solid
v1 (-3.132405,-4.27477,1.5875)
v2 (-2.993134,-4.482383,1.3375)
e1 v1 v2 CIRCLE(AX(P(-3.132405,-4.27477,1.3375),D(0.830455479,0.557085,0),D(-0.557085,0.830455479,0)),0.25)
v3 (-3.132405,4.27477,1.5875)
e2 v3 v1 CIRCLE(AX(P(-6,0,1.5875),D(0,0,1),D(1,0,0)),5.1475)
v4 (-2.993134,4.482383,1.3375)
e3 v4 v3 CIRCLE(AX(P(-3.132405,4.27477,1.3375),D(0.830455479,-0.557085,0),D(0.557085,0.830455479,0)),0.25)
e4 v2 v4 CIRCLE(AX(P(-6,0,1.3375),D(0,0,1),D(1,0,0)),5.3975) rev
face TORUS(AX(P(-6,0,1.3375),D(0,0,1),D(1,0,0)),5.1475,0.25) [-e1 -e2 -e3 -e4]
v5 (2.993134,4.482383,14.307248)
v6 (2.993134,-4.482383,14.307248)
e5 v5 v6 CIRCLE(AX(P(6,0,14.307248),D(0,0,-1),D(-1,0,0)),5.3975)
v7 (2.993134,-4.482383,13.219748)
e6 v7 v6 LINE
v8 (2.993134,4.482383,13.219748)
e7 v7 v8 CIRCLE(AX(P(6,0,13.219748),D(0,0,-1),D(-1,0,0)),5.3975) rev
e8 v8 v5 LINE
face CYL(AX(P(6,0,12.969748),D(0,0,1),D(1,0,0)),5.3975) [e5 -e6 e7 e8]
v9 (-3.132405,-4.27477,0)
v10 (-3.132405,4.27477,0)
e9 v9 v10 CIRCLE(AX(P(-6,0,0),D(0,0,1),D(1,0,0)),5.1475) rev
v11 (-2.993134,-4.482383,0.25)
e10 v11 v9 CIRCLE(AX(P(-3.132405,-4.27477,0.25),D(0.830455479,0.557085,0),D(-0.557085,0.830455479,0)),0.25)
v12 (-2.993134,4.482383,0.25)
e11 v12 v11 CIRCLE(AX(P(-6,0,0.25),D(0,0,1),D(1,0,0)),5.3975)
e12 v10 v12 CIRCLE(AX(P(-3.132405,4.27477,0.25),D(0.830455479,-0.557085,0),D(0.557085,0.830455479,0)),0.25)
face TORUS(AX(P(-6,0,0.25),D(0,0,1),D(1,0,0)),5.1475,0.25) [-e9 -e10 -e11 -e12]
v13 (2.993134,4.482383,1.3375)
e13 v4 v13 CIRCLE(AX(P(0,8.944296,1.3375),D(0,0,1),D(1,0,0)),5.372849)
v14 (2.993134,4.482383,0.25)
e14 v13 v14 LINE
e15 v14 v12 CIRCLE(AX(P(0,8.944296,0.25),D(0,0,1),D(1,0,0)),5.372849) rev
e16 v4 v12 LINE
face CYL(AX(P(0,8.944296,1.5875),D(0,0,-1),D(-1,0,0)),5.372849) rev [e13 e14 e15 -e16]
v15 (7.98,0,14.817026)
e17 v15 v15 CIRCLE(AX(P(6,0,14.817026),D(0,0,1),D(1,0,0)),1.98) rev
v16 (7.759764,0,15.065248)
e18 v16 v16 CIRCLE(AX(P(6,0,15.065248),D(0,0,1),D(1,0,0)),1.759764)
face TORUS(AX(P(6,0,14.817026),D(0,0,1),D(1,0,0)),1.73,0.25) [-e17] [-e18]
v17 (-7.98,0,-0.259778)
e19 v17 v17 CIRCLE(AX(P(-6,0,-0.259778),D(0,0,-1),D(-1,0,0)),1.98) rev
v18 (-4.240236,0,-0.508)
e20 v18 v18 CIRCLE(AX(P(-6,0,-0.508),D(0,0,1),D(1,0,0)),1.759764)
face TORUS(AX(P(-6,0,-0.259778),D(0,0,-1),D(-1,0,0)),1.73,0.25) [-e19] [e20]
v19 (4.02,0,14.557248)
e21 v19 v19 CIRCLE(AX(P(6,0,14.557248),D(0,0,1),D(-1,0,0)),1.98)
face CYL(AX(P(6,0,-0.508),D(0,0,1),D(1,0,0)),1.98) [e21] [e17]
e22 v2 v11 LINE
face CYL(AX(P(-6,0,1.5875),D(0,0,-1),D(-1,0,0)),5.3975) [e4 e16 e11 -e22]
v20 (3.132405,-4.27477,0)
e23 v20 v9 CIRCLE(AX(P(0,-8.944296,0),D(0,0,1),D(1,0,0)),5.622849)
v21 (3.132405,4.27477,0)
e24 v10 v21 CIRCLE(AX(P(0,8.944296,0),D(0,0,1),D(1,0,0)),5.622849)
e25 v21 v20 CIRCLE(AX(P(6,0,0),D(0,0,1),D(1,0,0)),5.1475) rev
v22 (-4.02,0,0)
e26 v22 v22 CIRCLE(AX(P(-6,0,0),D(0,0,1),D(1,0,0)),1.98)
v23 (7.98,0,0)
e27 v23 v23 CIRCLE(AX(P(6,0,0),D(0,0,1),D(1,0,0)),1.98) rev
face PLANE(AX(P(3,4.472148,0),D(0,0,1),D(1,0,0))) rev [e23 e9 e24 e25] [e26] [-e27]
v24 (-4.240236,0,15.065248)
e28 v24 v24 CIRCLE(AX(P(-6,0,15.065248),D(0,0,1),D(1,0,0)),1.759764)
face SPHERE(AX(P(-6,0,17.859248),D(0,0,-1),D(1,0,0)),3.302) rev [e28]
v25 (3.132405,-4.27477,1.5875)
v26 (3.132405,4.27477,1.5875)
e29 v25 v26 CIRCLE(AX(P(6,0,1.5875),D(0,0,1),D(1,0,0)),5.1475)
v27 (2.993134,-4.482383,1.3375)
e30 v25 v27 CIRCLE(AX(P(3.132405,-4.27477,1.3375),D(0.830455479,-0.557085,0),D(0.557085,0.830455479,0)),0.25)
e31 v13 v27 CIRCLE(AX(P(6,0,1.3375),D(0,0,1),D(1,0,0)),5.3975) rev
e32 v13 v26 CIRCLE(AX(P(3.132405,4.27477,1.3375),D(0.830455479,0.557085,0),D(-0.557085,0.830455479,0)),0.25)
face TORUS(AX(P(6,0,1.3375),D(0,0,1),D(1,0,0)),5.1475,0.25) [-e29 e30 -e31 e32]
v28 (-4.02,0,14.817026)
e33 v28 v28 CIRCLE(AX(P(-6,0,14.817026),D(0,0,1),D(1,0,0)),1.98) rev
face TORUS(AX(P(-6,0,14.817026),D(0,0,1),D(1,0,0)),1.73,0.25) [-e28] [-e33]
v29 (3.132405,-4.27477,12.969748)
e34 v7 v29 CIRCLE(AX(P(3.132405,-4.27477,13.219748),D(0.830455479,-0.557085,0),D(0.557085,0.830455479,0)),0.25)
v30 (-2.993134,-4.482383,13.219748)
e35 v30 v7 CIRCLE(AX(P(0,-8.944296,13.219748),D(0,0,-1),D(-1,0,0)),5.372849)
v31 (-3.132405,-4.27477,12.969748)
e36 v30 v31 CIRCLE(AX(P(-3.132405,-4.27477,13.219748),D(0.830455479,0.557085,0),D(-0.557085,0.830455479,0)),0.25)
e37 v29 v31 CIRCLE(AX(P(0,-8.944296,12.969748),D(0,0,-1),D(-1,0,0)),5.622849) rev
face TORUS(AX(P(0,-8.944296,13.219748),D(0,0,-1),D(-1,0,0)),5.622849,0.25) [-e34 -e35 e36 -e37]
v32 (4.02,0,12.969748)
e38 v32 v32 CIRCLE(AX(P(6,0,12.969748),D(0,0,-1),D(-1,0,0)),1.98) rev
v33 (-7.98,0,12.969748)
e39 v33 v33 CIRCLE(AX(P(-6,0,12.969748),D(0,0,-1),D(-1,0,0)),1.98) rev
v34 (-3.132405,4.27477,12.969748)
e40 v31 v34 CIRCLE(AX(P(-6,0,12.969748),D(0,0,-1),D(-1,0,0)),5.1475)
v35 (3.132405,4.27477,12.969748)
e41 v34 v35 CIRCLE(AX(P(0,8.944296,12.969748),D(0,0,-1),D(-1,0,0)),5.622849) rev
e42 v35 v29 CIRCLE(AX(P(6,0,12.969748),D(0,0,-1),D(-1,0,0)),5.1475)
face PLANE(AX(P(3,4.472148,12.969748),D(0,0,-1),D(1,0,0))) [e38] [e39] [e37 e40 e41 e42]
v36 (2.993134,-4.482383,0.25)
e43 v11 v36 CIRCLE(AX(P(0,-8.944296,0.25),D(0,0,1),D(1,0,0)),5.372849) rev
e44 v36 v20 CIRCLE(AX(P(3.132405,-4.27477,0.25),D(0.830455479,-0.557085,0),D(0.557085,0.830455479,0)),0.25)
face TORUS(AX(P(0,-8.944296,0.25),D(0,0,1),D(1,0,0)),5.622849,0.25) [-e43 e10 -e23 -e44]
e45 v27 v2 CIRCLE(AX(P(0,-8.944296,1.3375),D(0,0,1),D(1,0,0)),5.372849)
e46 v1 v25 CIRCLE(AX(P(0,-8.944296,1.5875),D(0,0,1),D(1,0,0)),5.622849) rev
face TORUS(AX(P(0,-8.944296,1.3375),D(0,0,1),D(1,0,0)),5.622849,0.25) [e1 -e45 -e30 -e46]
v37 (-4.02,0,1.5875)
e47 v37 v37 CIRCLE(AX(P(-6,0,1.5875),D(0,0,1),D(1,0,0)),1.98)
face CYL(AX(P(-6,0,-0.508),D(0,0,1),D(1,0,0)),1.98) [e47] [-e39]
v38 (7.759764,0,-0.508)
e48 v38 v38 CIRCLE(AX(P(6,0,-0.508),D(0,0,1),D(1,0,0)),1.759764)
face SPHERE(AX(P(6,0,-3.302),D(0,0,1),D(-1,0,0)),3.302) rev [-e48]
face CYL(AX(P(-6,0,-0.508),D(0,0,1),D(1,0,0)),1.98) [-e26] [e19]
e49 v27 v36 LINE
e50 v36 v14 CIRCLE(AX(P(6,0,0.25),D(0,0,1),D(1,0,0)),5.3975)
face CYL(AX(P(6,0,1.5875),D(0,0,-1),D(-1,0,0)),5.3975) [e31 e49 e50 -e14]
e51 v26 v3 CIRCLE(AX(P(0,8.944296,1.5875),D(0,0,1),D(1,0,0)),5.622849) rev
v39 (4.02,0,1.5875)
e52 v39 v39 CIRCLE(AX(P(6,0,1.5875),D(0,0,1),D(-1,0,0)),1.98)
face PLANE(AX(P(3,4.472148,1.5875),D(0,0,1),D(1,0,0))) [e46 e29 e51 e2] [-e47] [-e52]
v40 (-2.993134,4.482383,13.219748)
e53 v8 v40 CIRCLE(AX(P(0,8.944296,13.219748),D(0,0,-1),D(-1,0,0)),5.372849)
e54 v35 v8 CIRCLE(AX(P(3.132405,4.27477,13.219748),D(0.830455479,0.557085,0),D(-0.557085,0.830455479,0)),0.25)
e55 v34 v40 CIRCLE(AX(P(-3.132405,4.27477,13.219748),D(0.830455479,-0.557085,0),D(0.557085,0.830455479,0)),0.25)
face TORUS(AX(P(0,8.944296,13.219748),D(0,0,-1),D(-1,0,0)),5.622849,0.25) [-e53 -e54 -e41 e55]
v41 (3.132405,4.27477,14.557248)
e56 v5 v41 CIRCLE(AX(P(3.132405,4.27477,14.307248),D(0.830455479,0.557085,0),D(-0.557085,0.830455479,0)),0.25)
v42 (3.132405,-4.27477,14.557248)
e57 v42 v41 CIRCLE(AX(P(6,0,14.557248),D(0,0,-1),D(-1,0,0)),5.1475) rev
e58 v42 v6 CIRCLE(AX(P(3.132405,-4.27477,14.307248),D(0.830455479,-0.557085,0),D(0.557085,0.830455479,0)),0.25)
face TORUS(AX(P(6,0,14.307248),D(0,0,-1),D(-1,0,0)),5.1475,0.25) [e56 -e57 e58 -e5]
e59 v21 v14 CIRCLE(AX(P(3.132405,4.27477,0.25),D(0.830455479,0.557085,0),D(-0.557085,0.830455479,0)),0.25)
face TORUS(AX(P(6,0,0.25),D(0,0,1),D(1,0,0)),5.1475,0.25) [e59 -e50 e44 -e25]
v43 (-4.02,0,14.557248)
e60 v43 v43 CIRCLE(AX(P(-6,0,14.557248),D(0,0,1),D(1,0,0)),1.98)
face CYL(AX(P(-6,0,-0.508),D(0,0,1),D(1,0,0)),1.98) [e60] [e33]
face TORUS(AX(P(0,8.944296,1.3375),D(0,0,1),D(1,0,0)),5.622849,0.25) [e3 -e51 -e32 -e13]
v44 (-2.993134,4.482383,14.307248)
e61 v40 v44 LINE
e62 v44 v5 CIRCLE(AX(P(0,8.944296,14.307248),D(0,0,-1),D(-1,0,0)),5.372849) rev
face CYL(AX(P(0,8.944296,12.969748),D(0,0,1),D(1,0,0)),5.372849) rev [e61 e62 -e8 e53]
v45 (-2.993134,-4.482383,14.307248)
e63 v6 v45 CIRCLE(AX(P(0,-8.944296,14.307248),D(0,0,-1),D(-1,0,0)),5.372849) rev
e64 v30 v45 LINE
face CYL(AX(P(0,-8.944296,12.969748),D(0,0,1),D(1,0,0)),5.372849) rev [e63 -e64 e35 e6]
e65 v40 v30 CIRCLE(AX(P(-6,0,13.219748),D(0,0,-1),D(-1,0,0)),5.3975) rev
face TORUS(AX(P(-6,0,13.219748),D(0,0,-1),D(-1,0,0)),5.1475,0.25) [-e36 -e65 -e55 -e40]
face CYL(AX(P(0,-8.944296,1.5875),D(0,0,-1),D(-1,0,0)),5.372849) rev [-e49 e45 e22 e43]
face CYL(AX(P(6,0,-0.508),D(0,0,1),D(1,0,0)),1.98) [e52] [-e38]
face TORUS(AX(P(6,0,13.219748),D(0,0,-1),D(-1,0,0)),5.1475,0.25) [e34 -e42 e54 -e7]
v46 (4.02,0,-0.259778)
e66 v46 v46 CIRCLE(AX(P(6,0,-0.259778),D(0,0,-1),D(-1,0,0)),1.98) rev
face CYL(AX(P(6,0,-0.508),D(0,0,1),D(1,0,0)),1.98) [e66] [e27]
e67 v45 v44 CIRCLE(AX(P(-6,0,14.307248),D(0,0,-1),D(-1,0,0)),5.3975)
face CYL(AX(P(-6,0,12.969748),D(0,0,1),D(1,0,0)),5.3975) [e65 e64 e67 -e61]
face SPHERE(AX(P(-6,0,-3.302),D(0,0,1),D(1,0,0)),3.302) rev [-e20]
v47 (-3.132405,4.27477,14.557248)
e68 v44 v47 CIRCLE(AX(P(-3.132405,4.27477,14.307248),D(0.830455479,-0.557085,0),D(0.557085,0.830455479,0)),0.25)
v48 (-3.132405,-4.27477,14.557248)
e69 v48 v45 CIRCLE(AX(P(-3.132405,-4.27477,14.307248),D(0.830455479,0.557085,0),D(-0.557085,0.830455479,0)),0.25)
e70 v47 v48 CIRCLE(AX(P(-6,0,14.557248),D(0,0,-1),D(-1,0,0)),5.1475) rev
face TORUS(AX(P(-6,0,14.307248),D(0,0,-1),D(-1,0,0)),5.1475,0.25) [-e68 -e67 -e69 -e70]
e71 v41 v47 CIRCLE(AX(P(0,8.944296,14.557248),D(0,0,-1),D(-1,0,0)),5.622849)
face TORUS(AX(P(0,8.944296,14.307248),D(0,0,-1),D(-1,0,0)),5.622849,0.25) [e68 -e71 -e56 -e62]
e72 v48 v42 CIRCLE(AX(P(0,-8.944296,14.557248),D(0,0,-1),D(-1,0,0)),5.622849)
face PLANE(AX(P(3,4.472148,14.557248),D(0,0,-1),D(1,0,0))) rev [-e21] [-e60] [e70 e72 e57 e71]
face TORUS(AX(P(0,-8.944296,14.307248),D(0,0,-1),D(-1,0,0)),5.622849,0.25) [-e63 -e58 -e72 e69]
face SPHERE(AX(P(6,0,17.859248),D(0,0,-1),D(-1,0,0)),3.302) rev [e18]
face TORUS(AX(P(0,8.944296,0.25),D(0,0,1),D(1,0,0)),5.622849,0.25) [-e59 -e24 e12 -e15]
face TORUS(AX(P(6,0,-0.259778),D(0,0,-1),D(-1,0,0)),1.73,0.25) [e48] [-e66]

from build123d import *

# Parameters (mm, degrees)
SKETCH2_R           = 1.98
BOSS_EXTRUDE2_DEPTH = 1.5875
BOSS_EXTRUDE3_START = -0.508
SKETCH3_R           = 1.98
BOSS_EXTRUDE3_DEPTH = 15.573248
FILLET1_R           = 0.25
FILLET2_R           = 0.25


with BuildPart() as part:
    # Sketch2 → Boss-Extrude2 (new body)
    with BuildSketch(Plane.XY):
        with BuildLine():
            ThreePointArc((-2.993133713, 4.482383449), (-11.3975, 0), (-2.993133713, -4.482383449))
            ThreePointArc((-2.993133713, -4.482383449), (0, -3.571446301), (2.993133713, -4.482383449))
            ThreePointArc((2.993133713, -4.482383449), (11.3975, 0), (2.993133713, 4.482383449))
            ThreePointArc((2.993133713, 4.482383449), (0, 3.571446301), (-2.993133713, 4.482383449))
        make_face()
        with Locations((-6, 0)):
            Circle(SKETCH2_R, mode=Mode.SUBTRACT)
        with Locations(Location((6, 0, 0), (0, 0, 180))):
            Circle(SKETCH2_R, mode=Mode.SUBTRACT)
    boss_extrude2 = extrude(amount=BOSS_EXTRUDE2_DEPTH)

    # Sketch3 → Boss-Extrude3 (add)
    with BuildSketch(Plane.XY.offset(BOSS_EXTRUDE3_START)):
        with Locations((-6, 0)):
            Circle(SKETCH3_R)
    boss_extrude3 = extrude(amount=BOSS_EXTRUDE3_DEPTH)

    # Mirror1: Boss-Extrude2 across plane
    add(boss_extrude2.mirror(Plane(origin=(0, 0, 7.278624), x_dir=(1, 0, 0), z_dir=(0, 0, -1))))

    # Sketch5 → Cut-Revolve1 (revolve, cut)
    with BuildSketch(Plane(origin=(0, 0, 0), x_dir=(1, 0, 0), z_dir=(0, 1, 0)), mode=Mode.PRIVATE) as cut_revolve1_sk:
        with BuildLine():
            Line((-6, -15.319248), (-8.109882461, -15.319248))
            ThreePointArc((-8.109882461, -15.319248), (-7.12163363, -14.753585108), (-6, -14.557248))
            Line((-6, -14.557248), (-6, -15.319248))
        make_face()
    cut_revolve1 = revolve(cut_revolve1_sk.sketch.rotate(Axis((-6, 0, 14.557248), (0, 0, 1)), 180), axis=Axis((-6, 0, 14.557248), (0, 0, 1)), mode=Mode.SUBTRACT)

    # Mirror2: Cut-Revolve1 across plane
    add(cut_revolve1.mirror(Plane(origin=(0, 0, 7.278624), x_dir=(1, 0, 0), z_dir=(0, 0, -1))), mode=Mode.SUBTRACT)

    # Mirror3: Boss-Extrude3, Cut-Revolve1 across plane
    add(boss_extrude3.mirror(Plane(origin=(0, 0, 0), x_dir=(0, 0, 1), z_dir=(1, 0, 0))))
    add(cut_revolve1.mirror(Plane(origin=(0, 0, 0), x_dir=(0, 0, 1), z_dir=(1, 0, 0))), mode=Mode.SUBTRACT)

    # Mirror3 copy 1 sketch → Mirror3 copy 1 (revolve, cut)
    with BuildSketch(Plane(origin=(0, 0, 14.557248), x_dir=(-1, 0, 0), z_dir=(0, 1, 0))):
        with BuildLine():
            Line((-6, -15.319248), (-8.109882461, -15.319248))
            ThreePointArc((-8.109882461, -15.319248), (-7.12163363, -14.753585108), (-6, -14.557248))
            Line((-6, -14.557248), (-6, -15.319248))
        make_face()
    revolve(axis=Axis((6, 0, 0), (0, 0, -1)), mode=Mode.SUBTRACT)

    # Fillet1
    fillet1_edges = [part.edges().sort_by_distance(p)[0] for p in [
        (0, -3.571446301, 1.5875),
        (11.3975, 0, 1.5875),
        (0, 3.571446301, 12.969748),
        (11.3975, 0, 12.969748),
        (0, -3.571446301, 12.969748),
        (-11.3975, 0, 12.969748),
        (0, 3.571446301, 14.557248),
        (-11.3975, 0, 14.557248),
        (0, -3.571446301, 14.557248),
        (11.3975, 0, 14.557248),
        (0, 3.571446301, 1.5875),
        (11.3975, 0, 0),
        (0, -3.571446301, 0),
        (-11.3975, 0, 0),
        (0, 3.571446301, 0),
        (-11.3975, 0, 1.5875),
    ]]
    fillet(fillet1_edges, radius=FILLET1_R)

    # Fillet2
    # the kernel refuses this fillet: 0.25 mm, written as the material it takes off along each edge
    with BuildSketch(Plane(origin=(-6, 0, -0.508), x_dir=(1, 0, 0), z_dir=(0, -1, 0))) as fillet2_piece_1:
        with BuildLine():
            CenterArc((1.73, 0.248221931), FILLET2_R, 276.837537201, 83.162462799)
            Line((1.75976362, 0), (1.760358893, -0.004964439))
            ThreePointArc((1.760358893, -0.004964439), (1.86988181, -0.005), (1.98, -0.005))
            Line((1.98, -0.005), (1.985, 0))
            Line((1.985, 0), (1.985, 0.248221931))
            Line((1.985, 0.248221931), (1.98, 0.248221931))
        make_face()
    revolve(axis=Axis((-6, 0, -0.508), (0, 0, 1)), mode=Mode.SUBTRACT)
    with BuildSketch(Plane(origin=(-6, 0, 15.065248), x_dir=(1, 0, 0), z_dir=(0, -1, 0))) as fillet2_piece_2:
        with BuildLine():
            CenterArc((1.73, -0.248221931), FILLET2_R, 0, 83.162462799)
            Line((1.75976362, 0), (1.760358893, 0.004964439))
            ThreePointArc((1.760358893, 0.004964439), (1.86988181, 0.005), (1.98, 0.005))
            Line((1.98, 0.005), (1.985, 0))
            Line((1.985, 0), (1.985, -0.248221931))
            Line((1.985, -0.248221931), (1.98, -0.248221931))
        make_face()
    revolve(axis=Axis((-6, 0, 15.065248), (0, 0, 1)), mode=Mode.SUBTRACT)
    with BuildSketch(Plane(origin=(6, 0, 15.065248), x_dir=(-1, 0, 0), z_dir=(0, -1, 0))) as fillet2_piece_3:
        with BuildLine():
            CenterArc((1.73, 0.248221931), FILLET2_R, 276.837537201, 83.162462799)
            Line((1.75976362, 0), (1.760358893, -0.004964439))
            ThreePointArc((1.760358893, -0.004964439), (1.86988181, -0.005), (1.98, -0.005))
            Line((1.98, -0.005), (1.985, 0))
            Line((1.985, 0), (1.985, 0.248221931))
            Line((1.985, 0.248221931), (1.98, 0.248221931))
        make_face()
    revolve(axis=Axis((6, 0, 15.065248), (0, 0, -1)), mode=Mode.SUBTRACT)
    with BuildSketch(Plane(origin=(6, 0, -0.508), x_dir=(-1, 0, 0), z_dir=(0, -1, 0))) as fillet2_piece_4:
        with BuildLine():
            CenterArc((1.73, -0.248221931), FILLET2_R, 0, 83.162462799)
            Line((1.75976362, 0), (1.760358893, 0.004964439))
            ThreePointArc((1.760358893, 0.004964439), (1.86988181, 0.005), (1.98, 0.005))
            Line((1.98, 0.005), (1.985, 0))
            Line((1.985, 0), (1.985, -0.248221931))
            Line((1.985, -0.248221931), (1.98, -0.248221931))
        make_face()
    revolve(axis=Axis((6, 0, -0.508), (0, 0, -1)), mode=Mode.SUBTRACT)


solid = part.part
